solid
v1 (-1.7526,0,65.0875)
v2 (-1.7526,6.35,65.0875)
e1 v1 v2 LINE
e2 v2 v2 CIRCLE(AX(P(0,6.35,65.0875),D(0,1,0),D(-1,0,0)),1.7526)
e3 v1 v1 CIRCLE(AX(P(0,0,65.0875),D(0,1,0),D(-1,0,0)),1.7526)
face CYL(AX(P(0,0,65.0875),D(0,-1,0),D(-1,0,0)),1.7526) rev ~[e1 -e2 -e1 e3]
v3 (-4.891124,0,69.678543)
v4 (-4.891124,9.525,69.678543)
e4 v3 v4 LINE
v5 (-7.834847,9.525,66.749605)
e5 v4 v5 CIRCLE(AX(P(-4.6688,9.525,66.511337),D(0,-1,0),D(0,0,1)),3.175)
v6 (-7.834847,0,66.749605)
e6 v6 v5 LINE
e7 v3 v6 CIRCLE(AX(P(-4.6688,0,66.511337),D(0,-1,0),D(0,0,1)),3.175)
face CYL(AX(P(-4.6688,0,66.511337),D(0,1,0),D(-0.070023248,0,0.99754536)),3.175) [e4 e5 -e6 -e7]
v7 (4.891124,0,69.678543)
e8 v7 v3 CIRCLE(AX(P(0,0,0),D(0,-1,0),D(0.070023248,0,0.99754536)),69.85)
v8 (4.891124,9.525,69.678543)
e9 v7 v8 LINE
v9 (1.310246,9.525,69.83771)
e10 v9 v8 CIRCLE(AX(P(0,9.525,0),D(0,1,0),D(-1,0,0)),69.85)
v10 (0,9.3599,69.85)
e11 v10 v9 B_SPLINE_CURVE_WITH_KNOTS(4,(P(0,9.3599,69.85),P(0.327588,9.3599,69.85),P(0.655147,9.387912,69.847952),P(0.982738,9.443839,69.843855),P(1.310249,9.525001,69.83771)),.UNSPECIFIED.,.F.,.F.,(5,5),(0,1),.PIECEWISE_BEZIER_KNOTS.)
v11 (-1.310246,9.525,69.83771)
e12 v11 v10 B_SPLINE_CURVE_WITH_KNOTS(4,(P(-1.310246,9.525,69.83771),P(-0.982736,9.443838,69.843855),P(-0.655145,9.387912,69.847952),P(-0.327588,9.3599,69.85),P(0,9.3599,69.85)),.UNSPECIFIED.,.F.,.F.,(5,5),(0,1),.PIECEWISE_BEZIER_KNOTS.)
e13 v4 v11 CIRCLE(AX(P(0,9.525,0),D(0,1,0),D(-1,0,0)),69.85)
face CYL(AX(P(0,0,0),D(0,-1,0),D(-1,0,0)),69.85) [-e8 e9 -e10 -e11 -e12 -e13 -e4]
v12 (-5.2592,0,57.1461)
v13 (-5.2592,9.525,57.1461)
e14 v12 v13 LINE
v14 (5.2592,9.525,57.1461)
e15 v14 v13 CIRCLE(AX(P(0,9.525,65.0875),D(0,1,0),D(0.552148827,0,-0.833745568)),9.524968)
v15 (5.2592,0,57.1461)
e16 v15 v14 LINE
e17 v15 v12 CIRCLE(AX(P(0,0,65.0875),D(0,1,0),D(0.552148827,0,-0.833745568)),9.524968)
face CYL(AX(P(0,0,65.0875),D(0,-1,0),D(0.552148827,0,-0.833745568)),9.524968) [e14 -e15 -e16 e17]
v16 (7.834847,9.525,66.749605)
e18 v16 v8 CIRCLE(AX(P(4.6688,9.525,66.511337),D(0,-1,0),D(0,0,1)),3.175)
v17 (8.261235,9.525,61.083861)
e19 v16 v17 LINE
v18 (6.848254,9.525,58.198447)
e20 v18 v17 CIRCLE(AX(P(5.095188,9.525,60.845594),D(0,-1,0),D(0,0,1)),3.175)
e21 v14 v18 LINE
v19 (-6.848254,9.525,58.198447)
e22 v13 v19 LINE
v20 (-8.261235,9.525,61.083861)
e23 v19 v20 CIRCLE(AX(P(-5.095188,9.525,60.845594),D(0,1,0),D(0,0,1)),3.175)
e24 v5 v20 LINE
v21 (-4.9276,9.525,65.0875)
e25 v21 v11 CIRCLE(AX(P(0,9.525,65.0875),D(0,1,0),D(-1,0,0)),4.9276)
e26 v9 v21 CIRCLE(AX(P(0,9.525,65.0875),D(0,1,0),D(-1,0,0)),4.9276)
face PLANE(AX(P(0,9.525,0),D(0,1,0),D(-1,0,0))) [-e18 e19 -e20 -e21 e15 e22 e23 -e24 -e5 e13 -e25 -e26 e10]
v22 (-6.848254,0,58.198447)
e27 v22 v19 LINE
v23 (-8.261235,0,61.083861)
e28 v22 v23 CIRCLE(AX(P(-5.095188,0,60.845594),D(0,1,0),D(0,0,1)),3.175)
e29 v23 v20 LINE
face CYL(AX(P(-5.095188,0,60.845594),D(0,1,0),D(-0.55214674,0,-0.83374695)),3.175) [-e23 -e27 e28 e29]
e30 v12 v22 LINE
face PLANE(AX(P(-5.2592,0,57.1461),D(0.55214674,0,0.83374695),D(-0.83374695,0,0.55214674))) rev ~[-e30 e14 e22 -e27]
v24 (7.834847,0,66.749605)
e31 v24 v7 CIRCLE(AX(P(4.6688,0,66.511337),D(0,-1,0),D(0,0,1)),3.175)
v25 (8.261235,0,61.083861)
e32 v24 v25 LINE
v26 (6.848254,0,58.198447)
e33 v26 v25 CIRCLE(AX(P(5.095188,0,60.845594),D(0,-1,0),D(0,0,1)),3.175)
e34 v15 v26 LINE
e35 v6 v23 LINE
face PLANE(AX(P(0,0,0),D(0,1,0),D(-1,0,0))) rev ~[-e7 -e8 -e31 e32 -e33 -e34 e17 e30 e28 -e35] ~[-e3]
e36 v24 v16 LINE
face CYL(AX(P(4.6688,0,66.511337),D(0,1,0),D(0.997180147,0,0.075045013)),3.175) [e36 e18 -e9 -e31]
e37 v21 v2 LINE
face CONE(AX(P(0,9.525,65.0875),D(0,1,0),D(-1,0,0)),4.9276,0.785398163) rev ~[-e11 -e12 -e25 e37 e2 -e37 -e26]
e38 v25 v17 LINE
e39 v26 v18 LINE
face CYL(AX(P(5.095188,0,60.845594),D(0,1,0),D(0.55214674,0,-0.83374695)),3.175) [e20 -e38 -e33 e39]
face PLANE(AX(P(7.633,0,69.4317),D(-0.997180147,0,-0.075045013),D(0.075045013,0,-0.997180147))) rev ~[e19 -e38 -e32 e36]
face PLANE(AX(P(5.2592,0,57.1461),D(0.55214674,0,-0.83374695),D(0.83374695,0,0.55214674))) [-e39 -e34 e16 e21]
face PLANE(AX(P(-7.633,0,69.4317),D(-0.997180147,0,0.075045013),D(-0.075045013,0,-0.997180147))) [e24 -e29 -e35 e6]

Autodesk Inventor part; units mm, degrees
ref_plane "YZ Plane" through (0, 0, 0) normal (1, 0, 0) x (0, 1, 0)
ref_plane "XZ Plane" through (0, 0, 0) normal (0, 1, 0) x (-1, 0, 0)
ref_plane "XY Plane" through (0, 0, 0) normal (0, 0, 1) x (1, 0, 0)
sketch "Sketch1" plane through (0, 0, 0) normal (0, 1, 0) x (-1, 0, 0)
  circle A0 centre (0, 0) radius 73.025
  circle A1 centre (0, 0) radius 84.1375
  line L0 (0, 0) -> (0, 84.1375) construction
  circle A2 centre (0, 65.0875) radius 1.7526
  circle A3 centre (0, 65.0875) radius 7.9375 construction
  circle A4 centre (-61.9019, 20.1131) radius 1.7526
  circle A5 centre (-61.9019, 20.1131) radius 7.9375 construction
  circle A6 centre (-38.2575, -52.6569) radius 1.7526
  circle A7 centre (-38.2575, -52.6569) radius 7.9375 construction
  circle A8 centre (38.2575, -52.6569) radius 1.7526
  circle A9 centre (38.2575, -52.6569) radius 7.9375 construction
  circle A10 centre (61.9019, 20.1131) radius 1.7526
  circle A11 centre (61.9019, 20.1131) radius 7.9375 construction
  arc A12 (-29.3651, -56.0703) -> (-44.2517, -45.2546) centre (-38.2575, -52.6569) ccw
  line L1 (-29.3651, -56.0703) -> (-32.8726, -65.2077)
  line L2 (-44.2517, -45.2546) -> (-51.858, -51.414)
  arc A13 (44.2517, -45.2546) -> (29.3651, -56.0703) centre (38.2575, -52.6569) ccw
  line L3 (29.3651, -56.0703) -> (32.8726, -65.2077)
  line L4 (44.2517, -45.2546) -> (51.858, -51.414)
  arc A14 (-5.2592, 57.1461) -> (5.2592, 57.1461) centre (0, 65.0875) ccw
  arc A15 (55.1667, 26.8483) -> (61.9019, 10.5881) centre (61.9019, 20.1131) ccw
  line L5 (61.9019, 10.5881) -> (72.2533, 10.5881)
  line L6 (0, 0) -> (61.9019, 20.1131) construction
  line L7 (55.1667, 26.8483) -> (63.8164, 35.4981)
  arc A16 (-61.9019, 10.5881) -> (-55.1667, 26.8483) centre (-61.9019, 20.1131) ccw
  line L8 (-61.9019, 10.5881) -> (-72.2533, 10.5881)
  line L9 (-55.1667, 26.8483) -> (-63.8164, 35.4981)
  line L10 (0, 0) -> (12.6807, 71.9156) construction
  circle A17 centre (11.8537, 67.2254) radius 3.3655
  circle A18 centre (0, 0) radius 68.2625 construction
  circle A19 centre (11.8537, 67.2254) radius 4.7625 construction
  circle A20 centre (-11.8537, 67.2254) radius 3.3655
  circle A21 centre (-11.8537, 67.2254) radius 4.7625 construction
  line L11 (-5.2592, 57.1461) -> (-23.4145, 69.1694)
  line L12 (5.2592, 57.1461) -> (23.4145, 69.1694)
  line L13 (7.9375, -79.375) -> (-7.9375, -79.375)
  line L14 (-7.9375, -79.375) -> (-7.9375, -73.025)
  line L15 (-7.9375, -73.025) -> (7.9375, -73.025)
  line L16 (7.9375, -73.025) -> (7.9375, -79.375)
  line L17 (7.9375, -79.375) -> (-7.9375, -73.025) construction
  line L18 (-7.9375, -79.375) -> (7.9375, -73.025) construction
  line L19 (0, -76.2) -> (0, -84.1375) construction
  line L20 (12.7, -82.55) -> (-12.7, -82.55) construction
  line L21 (-12.7, -82.55) -> (-12.7, -69.85)
  line L22 (-12.7, -69.85) -> (12.7, -69.85)
  line L23 (12.7, -69.85) -> (12.7, -82.55)
  line L24 (12.7, -82.55) -> (-12.7, -69.85) construction
  line L25 (-12.7, -82.55) -> (12.7, -69.85) construction
  line L26 (30.7823, -63.9747) -> (51.3313, -49.045)
  line L27 (36.5014, -63.744) -> (49.3446, -54.4129)
  line L28 (53.077, -59.5502) -> (40.2339, -68.8813)
  line L29 (40.2339, -68.8813) -> (36.5014, -63.744)
  line L30 (49.3446, -54.4129) -> (53.077, -59.5502)
  line L31 (53.077, -59.5502) -> (36.5014, -63.744) construction
  line L32 (40.2339, -68.8813) -> (49.3446, -54.4129) construction
  line L33 (51.3313, -49.045) -> (58.7962, -59.3195)
  line L34 (58.7962, -59.3195) -> (38.2472, -74.2492) construction
  line L35 (38.2472, -74.2492) -> (51.3313, -49.045) construction
  line L36 (58.7962, -59.3195) -> (30.7823, -63.9747) construction
  line L37 (38.2472, -74.2492) -> (30.7823, -63.9747)
  line L38 (62.5068, -33.6633) -> (70.3558, -9.5064)
  line L39 (66.9981, -30.115) -> (71.9037, -15.017)
  line L40 (77.9429, -16.9792) -> (73.0373, -32.0772)
  line L41 (73.0373, -32.0772) -> (66.9981, -30.115)
  line L42 (71.9037, -15.017) -> (77.9429, -16.9792)
  line L43 (77.9429, -16.9792) -> (66.9981, -30.115) construction
  line L44 (73.0373, -32.0772) -> (71.9037, -15.017) construction
  line L45 (70.3558, -9.5064) -> (82.4342, -13.4309)
  line L46 (82.4342, -13.4309) -> (74.5852, -37.5878) construction
  line L47 (74.5852, -37.5878) -> (70.3558, -9.5064) construction
  line L48 (82.4342, -13.4309) -> (62.5068, -33.6633) construction
  line L49 (74.5852, -37.5878) -> (62.5068, -33.6633)
  line L50 (70.3558, 9.5064) -> (62.5068, 33.6633)
  line L51 (71.9037, 15.017) -> (66.9981, 30.115)
  line L52 (73.0373, 32.0772) -> (77.9429, 16.9792)
  line L53 (77.9429, 16.9792) -> (71.9037, 15.017)
  line L54 (66.9981, 30.115) -> (73.0373, 32.0772)
  line L55 (73.0373, 32.0772) -> (71.9037, 15.017) construction
  line L56 (77.9429, 16.9792) -> (66.9981, 30.115) construction
  line L57 (62.5068, 33.6633) -> (74.5852, 37.5878)
  line L58 (74.5852, 37.5878) -> (82.4342, 13.4309) construction
  line L59 (82.4342, 13.4309) -> (62.5068, 33.6633) construction
  line L60 (74.5852, 37.5878) -> (70.3558, 9.5064) construction
  line L61 (82.4342, 13.4309) -> (70.3558, 9.5064)
  line L62 (51.3313, 49.045) -> (30.7823, 63.9747)
  line L63 (49.3446, 54.4129) -> (36.5014, 63.744)
  line L64 (40.2339, 68.8813) -> (53.077, 59.5502)
  line L65 (53.077, 59.5502) -> (49.3446, 54.4129)
  line L66 (36.5014, 63.744) -> (40.2339, 68.8813)
  line L67 (40.2339, 68.8813) -> (49.3446, 54.4129) construction
  line L68 (53.077, 59.5502) -> (36.5014, 63.744) construction
  line L69 (30.7823, 63.9747) -> (38.2472, 74.2492)
  line L70 (38.2472, 74.2492) -> (58.7962, 59.3195) construction
  line L71 (58.7962, 59.3195) -> (30.7823, 63.9747) construction
  line L72 (38.2472, 74.2492) -> (51.3313, 49.045) construction
  line L73 (58.7962, 59.3195) -> (51.3313, 49.045)
  circle A22 centre (0, 0) radius 69.85
  line L74 (17.6671, 70.8557) -> (16.0268, 64.2769)
  line L75 (-17.6671, 70.8557) -> (-16.0268, 64.2769)
  line L76 (-38.2575, -52.6569) -> (-49.4548, -68.0687) construction
  line L77 (12.7, 69.85) -> (-12.7, 69.85)
  line L78 (7.9375, 73.025) -> (-7.9375, 73.025)
  line L79 (-7.9375, 79.375) -> (7.9375, 79.375)
  line L80 (7.9375, 79.375) -> (7.9375, 73.025)
  line L81 (-7.9375, 73.025) -> (-7.9375, 79.375)
  line L82 (-7.9375, 79.375) -> (7.9375, 73.025) construction
  line L83 (7.9375, 79.375) -> (-7.9375, 73.025) construction
  line L84 (-12.7, 69.85) -> (-12.7, 82.55)
  line L85 (-12.7, 82.55) -> (12.7, 82.55) construction
  line L86 (12.7, 82.55) -> (-12.7, 69.85) construction
  line L87 (-12.7, 82.55) -> (12.7, 69.85) construction
  line L88 (12.7, 82.55) -> (12.7, 69.85)
  line L89 (-30.7823, 63.9747) -> (-51.3313, 49.045)
  line L90 (-36.5014, 63.744) -> (-49.3446, 54.4129)
  line L91 (-53.077, 59.5502) -> (-40.2339, 68.8813)
  line L92 (-40.2339, 68.8813) -> (-36.5014, 63.744)
  line L93 (-49.3446, 54.4129) -> (-53.077, 59.5502)
  line L94 (-53.077, 59.5502) -> (-36.5014, 63.744) construction
  line L95 (-40.2339, 68.8813) -> (-49.3446, 54.4129) construction
  line L96 (-51.3313, 49.045) -> (-58.7962, 59.3195)
  line L97 (-58.7962, 59.3195) -> (-38.2472, 74.2492) construction
  line L98 (-38.2472, 74.2492) -> (-51.3313, 49.045) construction
  line L99 (-58.7962, 59.3195) -> (-30.7823, 63.9747) construction
  line L100 (-38.2472, 74.2492) -> (-30.7823, 63.9747)
  line L101 (-62.5068, 33.6633) -> (-70.3558, 9.5064)
  line L102 (-66.9981, 30.115) -> (-71.9037, 15.017)
  line L103 (-77.9429, 16.9792) -> (-73.0373, 32.0772)
  line L104 (-73.0373, 32.0772) -> (-66.9981, 30.115)
  line L105 (-71.9037, 15.017) -> (-77.9429, 16.9792)
  line L106 (-77.9429, 16.9792) -> (-66.9981, 30.115) construction
  line L107 (-73.0373, 32.0772) -> (-71.9037, 15.017) construction
  line L108 (-70.3558, 9.5064) -> (-82.4342, 13.4309)
  line L109 (-82.4342, 13.4309) -> (-74.5852, 37.5878) construction
  line L110 (-74.5852, 37.5878) -> (-70.3558, 9.5064) construction
  line L111 (-82.4342, 13.4309) -> (-62.5068, 33.6633) construction
  line L112 (-74.5852, 37.5878) -> (-62.5068, 33.6633)
  line L113 (-70.3558, -9.5064) -> (-62.5068, -33.6633)
  line L114 (-71.9037, -15.017) -> (-66.9981, -30.115)
  line L115 (-73.0373, -32.0772) -> (-77.9429, -16.9792)
  line L116 (-77.9429, -16.9792) -> (-71.9037, -15.017)
  line L117 (-66.9981, -30.115) -> (-73.0373, -32.0772)
  line L118 (-73.0373, -32.0772) -> (-71.9037, -15.017) construction
  line L119 (-77.9429, -16.9792) -> (-66.9981, -30.115) construction
  line L120 (-62.5068, -33.6633) -> (-74.5852, -37.5878)
  line L121 (-74.5852, -37.5878) -> (-82.4342, -13.4309) construction
  line L122 (-82.4342, -13.4309) -> (-62.5068, -33.6633) construction
  line L123 (-74.5852, -37.5878) -> (-70.3558, -9.5064) construction
  line L124 (-82.4342, -13.4309) -> (-70.3558, -9.5064)
  line L125 (-51.3313, -49.045) -> (-30.7823, -63.9747)
  line L126 (-49.3446, -54.4129) -> (-36.5014, -63.744)
  line L127 (-40.2339, -68.8813) -> (-53.077, -59.5502)
  line L128 (-53.077, -59.5502) -> (-49.3446, -54.4129)
  line L129 (-36.5014, -63.744) -> (-40.2339, -68.8813)
  line L130 (-40.2339, -68.8813) -> (-49.3446, -54.4129) construction
  line L131 (-53.077, -59.5502) -> (-36.5014, -63.744) construction
  line L132 (-30.7823, -63.9747) -> (-38.2472, -74.2492)
  line L133 (-38.2472, -74.2492) -> (-58.7962, -59.3195) construction
  line L134 (-58.7962, -59.3195) -> (-30.7823, -63.9747) construction
  line L135 (-38.2472, -74.2492) -> (-51.3313, -49.045) construction
  line L136 (-58.7962, -59.3195) -> (-51.3313, -49.045)
  line L137 (7.633, 69.4317) -> (8.401, 59.2267)
  line L138 (-7.633, 69.4317) -> (-8.401, 59.2267)
  point P0 (51.858, -51.414)
  point P1 (64.5887, 34.0727)
  point P2 (44.7892, -61.6471)
  point P3 (72.4705, -23.5471)
  point P4 (72.4705, 23.5471)
  point P5 (44.7892, 61.6471)
  point P6 (12.7, -71.9122)
  point P7 (-12.7, -71.9122)
  point P8 (31.9944, 65.643)
  point P9 (52.5434, 50.7133)
  point P10 (64.468, 34.3005)
  point P11 (72.3171, 10.1437)
  point P12 (72.3171, -10.1437)
  point P13 (64.468, -34.3005)
  point P14 (52.5434, -50.7133)
  point P15 (31.9944, -65.643)
  point P16 (66.4313, 21.5848)
  point P17 (-20.018, 66.9201)
  point P18 (-61.4776, 33.1592)
  point P19 (20.018, 66.9201)
  point P20 (66.4313, -21.5848)
  point P21 (61.4776, 33.1592)
  point P22 (41.0568, -56.5098)
  point P23 (69.0428, 10.5881)
  point P24 (49.3775, -49.4053)
  point P25 (41.0568, 56.5098)
  point P26 (-69.0428, 10.5881)
  point P27 (-49.3775, -49.4053)
  point P28 (31.7288, -62.2279)
  point P29 (0, -69.85)
  point P30 (-31.7288, -62.2279)
  point P31 (0, 76.2)
  point P32 (-44.7892, 61.6471)
  point P33 (-72.4705, 23.5471)
  point P34 (-72.4705, -23.5471)
  point P35 (-44.7892, -61.6471)
  point P36 (32.0467, -63.0561)
  point P37 (50.0669, -49.9636)
  point P38 (70.0043, 10.5881)
  point P39 (62.7968, 32.7708)
  point P40 (12.7, 71.9122)
  point P41 (12.7, 70.4828)
  point P42 (9.1625, 69.2464)
  point P43 (-9.1625, 69.2464)
  point P44 (-12.7, 70.4828)
  point P45 (-12.7, 71.9122)
  point P46 (16.899, 67.775)
  point P47 (15.0737, 68.2041)
  point P48 (-15.0737, 68.2041)
  point P49 (-16.899, 67.775)
  dimension "d1" = 146.05
  dimension "d13" = 136.525
  dimension "d14" = 9.525
  dimension "d78" = 3.175
  dimension "d0" = 11.1125
  dimension "d2" = 3.5052
  dimension "d3" = 15.875
  dimension "d6" = 360
  dimension "d8" = 19.05
  dimension "d9" = 19.05
  dimension "d10" = 19.05
  dimension "d11" = 10
  dimension "d12" = 6.731
  dimension "d34" = 15.875
  dimension "d35" = 6.35
  dimension "d37" = 25.4
  dimension "d39" = 3.175
  dimension "d42" = 360
  dimension "d151" = 76.2
  dimension "d153" = 15
  dimension "d163" = 90
extrude "Extrusion1" add sketch "Sketch1" along normal blind 9.525 contours L12 A14 L11 L138 A22 L137
fillet "Fillet14" radius 3.175 4 edges at (-7.633, 4.7625, 69.4317) (-8.401, 4.7625, 59.2267) (8.401, 4.7625, 59.2267) (7.633, 4.7625, 69.4317)
chamfer "Chamfer15" distance 3.175 angle 45 1 edges at (1.7526, 9.525, 65.0875)
equation "\"d1\" = Ring_ID"
equation "\"BearingTol\" = 0.1"
equation "\"CSDepth\" = 1.7272"
equation "\"CSAngle\" = 41deg"
equation "\"Ring_ID\" = 146.05"
properties part number "Retaining Ring" material "UHMW, White"
